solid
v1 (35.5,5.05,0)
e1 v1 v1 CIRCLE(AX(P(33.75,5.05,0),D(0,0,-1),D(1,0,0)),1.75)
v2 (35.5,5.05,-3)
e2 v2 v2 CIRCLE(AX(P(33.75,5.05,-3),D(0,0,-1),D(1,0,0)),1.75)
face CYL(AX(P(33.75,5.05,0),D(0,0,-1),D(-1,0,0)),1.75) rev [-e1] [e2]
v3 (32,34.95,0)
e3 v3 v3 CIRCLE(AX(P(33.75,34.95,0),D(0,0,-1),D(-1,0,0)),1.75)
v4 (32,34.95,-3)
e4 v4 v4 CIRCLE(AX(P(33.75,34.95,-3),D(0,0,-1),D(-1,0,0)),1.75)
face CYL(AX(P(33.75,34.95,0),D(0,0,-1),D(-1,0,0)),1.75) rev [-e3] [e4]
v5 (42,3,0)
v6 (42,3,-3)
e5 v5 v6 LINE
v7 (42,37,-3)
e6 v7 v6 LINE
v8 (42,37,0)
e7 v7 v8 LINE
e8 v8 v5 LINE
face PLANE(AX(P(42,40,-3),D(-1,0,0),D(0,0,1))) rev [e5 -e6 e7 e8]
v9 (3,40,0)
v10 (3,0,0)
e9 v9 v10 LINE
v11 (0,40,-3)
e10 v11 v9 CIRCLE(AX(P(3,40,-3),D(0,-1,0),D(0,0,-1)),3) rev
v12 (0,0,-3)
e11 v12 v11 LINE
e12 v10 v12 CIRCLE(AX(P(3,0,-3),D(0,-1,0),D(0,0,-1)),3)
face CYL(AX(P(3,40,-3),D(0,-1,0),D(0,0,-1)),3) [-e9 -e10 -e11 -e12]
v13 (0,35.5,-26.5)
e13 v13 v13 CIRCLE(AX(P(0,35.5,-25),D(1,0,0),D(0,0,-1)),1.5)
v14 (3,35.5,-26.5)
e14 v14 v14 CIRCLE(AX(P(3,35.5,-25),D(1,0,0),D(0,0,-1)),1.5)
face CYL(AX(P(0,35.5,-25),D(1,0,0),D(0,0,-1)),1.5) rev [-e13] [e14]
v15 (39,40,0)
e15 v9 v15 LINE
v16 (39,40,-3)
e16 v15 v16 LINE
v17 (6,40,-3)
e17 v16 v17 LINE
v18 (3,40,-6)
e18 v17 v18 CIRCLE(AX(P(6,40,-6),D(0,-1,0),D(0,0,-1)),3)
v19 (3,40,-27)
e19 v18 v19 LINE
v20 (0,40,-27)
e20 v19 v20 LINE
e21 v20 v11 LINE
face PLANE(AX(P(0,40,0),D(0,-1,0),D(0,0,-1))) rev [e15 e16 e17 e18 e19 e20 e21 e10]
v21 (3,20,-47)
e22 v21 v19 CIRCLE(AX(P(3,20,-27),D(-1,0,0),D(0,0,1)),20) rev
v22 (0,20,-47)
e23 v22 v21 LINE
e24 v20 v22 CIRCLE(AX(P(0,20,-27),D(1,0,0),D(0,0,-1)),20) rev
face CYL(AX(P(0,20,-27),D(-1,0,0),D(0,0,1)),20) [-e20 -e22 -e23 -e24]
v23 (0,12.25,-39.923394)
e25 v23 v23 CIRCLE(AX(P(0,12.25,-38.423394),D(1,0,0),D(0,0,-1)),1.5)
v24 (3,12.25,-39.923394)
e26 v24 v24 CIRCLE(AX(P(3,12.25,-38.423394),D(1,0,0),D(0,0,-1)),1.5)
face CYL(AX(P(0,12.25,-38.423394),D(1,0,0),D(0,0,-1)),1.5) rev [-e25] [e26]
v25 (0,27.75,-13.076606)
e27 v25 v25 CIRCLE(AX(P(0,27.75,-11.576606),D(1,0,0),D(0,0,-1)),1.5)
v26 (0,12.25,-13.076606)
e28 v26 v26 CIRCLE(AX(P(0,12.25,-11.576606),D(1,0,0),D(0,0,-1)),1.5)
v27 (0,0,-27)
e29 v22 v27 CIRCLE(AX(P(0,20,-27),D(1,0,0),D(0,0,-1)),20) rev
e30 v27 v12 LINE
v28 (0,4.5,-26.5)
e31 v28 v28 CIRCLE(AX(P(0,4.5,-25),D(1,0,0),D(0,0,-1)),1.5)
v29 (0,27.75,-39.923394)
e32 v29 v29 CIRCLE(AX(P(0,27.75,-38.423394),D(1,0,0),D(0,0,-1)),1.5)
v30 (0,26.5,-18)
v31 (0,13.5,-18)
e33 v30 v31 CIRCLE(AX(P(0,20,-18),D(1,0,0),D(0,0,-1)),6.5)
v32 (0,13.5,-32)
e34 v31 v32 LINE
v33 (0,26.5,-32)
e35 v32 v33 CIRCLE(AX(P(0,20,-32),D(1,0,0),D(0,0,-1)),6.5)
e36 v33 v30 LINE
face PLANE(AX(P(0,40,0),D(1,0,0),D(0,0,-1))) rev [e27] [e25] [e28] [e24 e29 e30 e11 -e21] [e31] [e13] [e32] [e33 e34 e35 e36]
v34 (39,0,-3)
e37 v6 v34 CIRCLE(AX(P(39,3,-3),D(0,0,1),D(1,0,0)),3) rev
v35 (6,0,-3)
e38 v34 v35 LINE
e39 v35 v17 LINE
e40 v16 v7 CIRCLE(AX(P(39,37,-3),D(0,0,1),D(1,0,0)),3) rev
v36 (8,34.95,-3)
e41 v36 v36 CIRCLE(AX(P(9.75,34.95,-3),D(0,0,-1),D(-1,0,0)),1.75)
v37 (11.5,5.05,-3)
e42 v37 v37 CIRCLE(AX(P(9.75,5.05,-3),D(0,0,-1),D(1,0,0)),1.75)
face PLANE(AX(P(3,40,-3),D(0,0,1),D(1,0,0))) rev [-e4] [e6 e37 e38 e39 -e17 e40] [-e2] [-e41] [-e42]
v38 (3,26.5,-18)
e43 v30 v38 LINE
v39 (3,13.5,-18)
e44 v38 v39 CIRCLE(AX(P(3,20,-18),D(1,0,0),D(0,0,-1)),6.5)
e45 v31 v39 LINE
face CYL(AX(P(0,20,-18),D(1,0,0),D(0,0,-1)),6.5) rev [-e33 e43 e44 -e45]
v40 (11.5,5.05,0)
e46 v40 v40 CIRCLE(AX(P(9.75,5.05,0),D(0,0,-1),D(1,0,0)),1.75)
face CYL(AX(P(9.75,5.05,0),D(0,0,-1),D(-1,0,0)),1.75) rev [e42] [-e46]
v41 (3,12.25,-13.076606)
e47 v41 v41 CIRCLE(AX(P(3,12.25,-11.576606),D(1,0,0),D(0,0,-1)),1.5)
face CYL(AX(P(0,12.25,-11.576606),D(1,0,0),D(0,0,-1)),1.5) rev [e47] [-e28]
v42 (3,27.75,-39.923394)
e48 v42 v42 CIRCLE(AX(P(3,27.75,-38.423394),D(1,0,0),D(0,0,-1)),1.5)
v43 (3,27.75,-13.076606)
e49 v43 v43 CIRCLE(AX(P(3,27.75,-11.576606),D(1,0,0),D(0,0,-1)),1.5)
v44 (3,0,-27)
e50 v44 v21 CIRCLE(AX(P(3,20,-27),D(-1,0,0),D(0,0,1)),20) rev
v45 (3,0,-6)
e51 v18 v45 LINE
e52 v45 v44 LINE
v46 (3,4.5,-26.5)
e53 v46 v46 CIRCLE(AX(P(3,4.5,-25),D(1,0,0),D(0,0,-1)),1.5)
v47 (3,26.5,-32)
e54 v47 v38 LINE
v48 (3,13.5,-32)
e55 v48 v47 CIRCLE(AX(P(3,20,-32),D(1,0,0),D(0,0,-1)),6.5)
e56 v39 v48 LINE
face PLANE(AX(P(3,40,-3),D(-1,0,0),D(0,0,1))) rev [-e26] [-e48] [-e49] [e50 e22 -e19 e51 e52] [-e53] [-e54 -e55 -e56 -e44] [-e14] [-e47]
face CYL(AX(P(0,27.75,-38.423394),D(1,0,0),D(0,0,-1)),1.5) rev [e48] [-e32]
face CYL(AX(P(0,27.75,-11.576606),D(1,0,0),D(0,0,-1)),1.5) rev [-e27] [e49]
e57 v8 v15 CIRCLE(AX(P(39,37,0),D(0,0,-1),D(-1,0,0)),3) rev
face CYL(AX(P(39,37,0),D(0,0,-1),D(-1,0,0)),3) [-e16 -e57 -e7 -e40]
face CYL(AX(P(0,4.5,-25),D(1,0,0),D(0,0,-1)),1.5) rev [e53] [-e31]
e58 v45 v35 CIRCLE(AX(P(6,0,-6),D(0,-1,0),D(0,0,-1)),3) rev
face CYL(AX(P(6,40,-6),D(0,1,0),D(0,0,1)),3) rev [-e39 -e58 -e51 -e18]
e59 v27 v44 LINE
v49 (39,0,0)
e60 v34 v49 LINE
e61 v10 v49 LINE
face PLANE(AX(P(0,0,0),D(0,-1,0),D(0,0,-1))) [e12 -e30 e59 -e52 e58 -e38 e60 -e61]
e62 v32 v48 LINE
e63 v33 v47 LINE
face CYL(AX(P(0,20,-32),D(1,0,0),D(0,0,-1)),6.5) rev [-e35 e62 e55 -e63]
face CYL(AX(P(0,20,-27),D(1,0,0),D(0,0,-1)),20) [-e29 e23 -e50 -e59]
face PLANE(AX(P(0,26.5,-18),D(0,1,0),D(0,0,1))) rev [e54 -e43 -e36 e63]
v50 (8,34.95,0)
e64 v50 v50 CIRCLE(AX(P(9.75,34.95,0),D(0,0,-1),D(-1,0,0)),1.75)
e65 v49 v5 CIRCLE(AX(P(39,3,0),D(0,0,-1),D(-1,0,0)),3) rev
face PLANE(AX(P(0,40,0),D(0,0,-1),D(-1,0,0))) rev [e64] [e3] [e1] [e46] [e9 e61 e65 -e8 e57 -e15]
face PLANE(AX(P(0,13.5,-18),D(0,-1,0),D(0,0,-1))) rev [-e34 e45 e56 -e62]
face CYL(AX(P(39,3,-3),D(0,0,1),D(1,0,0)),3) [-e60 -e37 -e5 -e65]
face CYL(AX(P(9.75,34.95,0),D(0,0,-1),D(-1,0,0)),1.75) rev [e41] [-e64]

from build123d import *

# Parameters (mm, degrees)
ESTRUSIONE_ESTRUSIONE1_DEPTH = 40
SCHIZZO2_R                   = 1.5
TAGLIO_ESTRUSIONE1_DEPTH     = 74.006848994
RACCORDO1_R                  = 3
RACCORDO2_R                  = 20
SCHIZZO3_R                   = 1.75
TAGLIO_ESTRUSIONE2_DEPTH     = 73.801098893
RACCORDO3_R                  = 3


with BuildPart() as part:
    # Schizzo1 → Estrusione-Estrusione1 (new body)
    with BuildSketch(Plane(origin=(0, 0, 0), x_dir=(1, 0, 0), z_dir=(0, 1, 0))):
        Polygon((0, 0), (0, 47), (3, 47), (3, 3), (42, 3), (42, 0), align=None)
    extrude(amount=ESTRUSIONE_ESTRUSIONE1_DEPTH)

    # Schizzo2 → Taglio-Estrusione1 (cut, through all)
    with BuildSketch(Plane(origin=(3, 0, 0), x_dir=(0, 0, -1), z_dir=(1, 0, 0))):
        with Locations((25, 4.5)):
            Circle(SCHIZZO2_R)
        with Locations((11.576606241, 12.25)):
            Circle(SCHIZZO2_R)
        with Locations((11.576606241, 27.75)):
            Circle(SCHIZZO2_R)
        with Locations((25, 35.5)):
            Circle(SCHIZZO2_R)
        with Locations((38.423393759, 27.75)):
            Circle(SCHIZZO2_R)
        with Locations((38.423393759, 12.25)):
            Circle(SCHIZZO2_R)
        with BuildLine():
            Line((18, 26.5), (32, 26.5))
            ThreePointArc((32, 26.5), (38.5, 20), (32, 13.5))
            Line((32, 13.5), (18, 13.5))
            ThreePointArc((18, 13.5), (11.5, 20), (18, 26.5))
        make_face()
    extrude(amount=-TAGLIO_ESTRUSIONE1_DEPTH, mode=Mode.SUBTRACT)

    # Raccordo1
    raccordo1_edges = [part.edges().sort_by_distance(p)[0] for p in [
        (0, 20, 0),
        (3, 20, -3),
    ]]
    fillet(raccordo1_edges, radius=RACCORDO1_R)

    # Raccordo2
    raccordo2_edges = [part.edges().sort_by_distance(p)[0] for p in [
        (1.5, 0, -47),
        (1.5, 40, -47),
    ]]
    fillet(raccordo2_edges, radius=RACCORDO2_R - 0.0001)  # a hair under: the kernel refuses the full size

    # Schizzo3 → Taglio-Estrusione2 (cut, through all)
    with BuildSketch(Plane(origin=(0, 0, -3), x_dir=(-1, 0, 0), z_dir=(0, 0, -1))):
        with Locations((-33.75, 34.95)):
            Circle(SCHIZZO3_R)
        with Locations((-9.75, 34.95)):
            Circle(SCHIZZO3_R)
        with Locations(Location((-9.75, 5.05, 0), (0, 0, 180))):
            Circle(SCHIZZO3_R)
        with Locations(Location((-33.75, 5.05, 0), (0, 0, 180))):
            Circle(SCHIZZO3_R)
    extrude(amount=-TAGLIO_ESTRUSIONE2_DEPTH, mode=Mode.SUBTRACT)

    # Raccordo3
    raccordo3_edges = [part.edges().sort_by_distance(p)[0] for p in [
        (42, 0, -1.5),
        (42, 40, -1.5),
    ]]
    fillet(raccordo3_edges, radius=RACCORDO3_R)


solid = part.part
